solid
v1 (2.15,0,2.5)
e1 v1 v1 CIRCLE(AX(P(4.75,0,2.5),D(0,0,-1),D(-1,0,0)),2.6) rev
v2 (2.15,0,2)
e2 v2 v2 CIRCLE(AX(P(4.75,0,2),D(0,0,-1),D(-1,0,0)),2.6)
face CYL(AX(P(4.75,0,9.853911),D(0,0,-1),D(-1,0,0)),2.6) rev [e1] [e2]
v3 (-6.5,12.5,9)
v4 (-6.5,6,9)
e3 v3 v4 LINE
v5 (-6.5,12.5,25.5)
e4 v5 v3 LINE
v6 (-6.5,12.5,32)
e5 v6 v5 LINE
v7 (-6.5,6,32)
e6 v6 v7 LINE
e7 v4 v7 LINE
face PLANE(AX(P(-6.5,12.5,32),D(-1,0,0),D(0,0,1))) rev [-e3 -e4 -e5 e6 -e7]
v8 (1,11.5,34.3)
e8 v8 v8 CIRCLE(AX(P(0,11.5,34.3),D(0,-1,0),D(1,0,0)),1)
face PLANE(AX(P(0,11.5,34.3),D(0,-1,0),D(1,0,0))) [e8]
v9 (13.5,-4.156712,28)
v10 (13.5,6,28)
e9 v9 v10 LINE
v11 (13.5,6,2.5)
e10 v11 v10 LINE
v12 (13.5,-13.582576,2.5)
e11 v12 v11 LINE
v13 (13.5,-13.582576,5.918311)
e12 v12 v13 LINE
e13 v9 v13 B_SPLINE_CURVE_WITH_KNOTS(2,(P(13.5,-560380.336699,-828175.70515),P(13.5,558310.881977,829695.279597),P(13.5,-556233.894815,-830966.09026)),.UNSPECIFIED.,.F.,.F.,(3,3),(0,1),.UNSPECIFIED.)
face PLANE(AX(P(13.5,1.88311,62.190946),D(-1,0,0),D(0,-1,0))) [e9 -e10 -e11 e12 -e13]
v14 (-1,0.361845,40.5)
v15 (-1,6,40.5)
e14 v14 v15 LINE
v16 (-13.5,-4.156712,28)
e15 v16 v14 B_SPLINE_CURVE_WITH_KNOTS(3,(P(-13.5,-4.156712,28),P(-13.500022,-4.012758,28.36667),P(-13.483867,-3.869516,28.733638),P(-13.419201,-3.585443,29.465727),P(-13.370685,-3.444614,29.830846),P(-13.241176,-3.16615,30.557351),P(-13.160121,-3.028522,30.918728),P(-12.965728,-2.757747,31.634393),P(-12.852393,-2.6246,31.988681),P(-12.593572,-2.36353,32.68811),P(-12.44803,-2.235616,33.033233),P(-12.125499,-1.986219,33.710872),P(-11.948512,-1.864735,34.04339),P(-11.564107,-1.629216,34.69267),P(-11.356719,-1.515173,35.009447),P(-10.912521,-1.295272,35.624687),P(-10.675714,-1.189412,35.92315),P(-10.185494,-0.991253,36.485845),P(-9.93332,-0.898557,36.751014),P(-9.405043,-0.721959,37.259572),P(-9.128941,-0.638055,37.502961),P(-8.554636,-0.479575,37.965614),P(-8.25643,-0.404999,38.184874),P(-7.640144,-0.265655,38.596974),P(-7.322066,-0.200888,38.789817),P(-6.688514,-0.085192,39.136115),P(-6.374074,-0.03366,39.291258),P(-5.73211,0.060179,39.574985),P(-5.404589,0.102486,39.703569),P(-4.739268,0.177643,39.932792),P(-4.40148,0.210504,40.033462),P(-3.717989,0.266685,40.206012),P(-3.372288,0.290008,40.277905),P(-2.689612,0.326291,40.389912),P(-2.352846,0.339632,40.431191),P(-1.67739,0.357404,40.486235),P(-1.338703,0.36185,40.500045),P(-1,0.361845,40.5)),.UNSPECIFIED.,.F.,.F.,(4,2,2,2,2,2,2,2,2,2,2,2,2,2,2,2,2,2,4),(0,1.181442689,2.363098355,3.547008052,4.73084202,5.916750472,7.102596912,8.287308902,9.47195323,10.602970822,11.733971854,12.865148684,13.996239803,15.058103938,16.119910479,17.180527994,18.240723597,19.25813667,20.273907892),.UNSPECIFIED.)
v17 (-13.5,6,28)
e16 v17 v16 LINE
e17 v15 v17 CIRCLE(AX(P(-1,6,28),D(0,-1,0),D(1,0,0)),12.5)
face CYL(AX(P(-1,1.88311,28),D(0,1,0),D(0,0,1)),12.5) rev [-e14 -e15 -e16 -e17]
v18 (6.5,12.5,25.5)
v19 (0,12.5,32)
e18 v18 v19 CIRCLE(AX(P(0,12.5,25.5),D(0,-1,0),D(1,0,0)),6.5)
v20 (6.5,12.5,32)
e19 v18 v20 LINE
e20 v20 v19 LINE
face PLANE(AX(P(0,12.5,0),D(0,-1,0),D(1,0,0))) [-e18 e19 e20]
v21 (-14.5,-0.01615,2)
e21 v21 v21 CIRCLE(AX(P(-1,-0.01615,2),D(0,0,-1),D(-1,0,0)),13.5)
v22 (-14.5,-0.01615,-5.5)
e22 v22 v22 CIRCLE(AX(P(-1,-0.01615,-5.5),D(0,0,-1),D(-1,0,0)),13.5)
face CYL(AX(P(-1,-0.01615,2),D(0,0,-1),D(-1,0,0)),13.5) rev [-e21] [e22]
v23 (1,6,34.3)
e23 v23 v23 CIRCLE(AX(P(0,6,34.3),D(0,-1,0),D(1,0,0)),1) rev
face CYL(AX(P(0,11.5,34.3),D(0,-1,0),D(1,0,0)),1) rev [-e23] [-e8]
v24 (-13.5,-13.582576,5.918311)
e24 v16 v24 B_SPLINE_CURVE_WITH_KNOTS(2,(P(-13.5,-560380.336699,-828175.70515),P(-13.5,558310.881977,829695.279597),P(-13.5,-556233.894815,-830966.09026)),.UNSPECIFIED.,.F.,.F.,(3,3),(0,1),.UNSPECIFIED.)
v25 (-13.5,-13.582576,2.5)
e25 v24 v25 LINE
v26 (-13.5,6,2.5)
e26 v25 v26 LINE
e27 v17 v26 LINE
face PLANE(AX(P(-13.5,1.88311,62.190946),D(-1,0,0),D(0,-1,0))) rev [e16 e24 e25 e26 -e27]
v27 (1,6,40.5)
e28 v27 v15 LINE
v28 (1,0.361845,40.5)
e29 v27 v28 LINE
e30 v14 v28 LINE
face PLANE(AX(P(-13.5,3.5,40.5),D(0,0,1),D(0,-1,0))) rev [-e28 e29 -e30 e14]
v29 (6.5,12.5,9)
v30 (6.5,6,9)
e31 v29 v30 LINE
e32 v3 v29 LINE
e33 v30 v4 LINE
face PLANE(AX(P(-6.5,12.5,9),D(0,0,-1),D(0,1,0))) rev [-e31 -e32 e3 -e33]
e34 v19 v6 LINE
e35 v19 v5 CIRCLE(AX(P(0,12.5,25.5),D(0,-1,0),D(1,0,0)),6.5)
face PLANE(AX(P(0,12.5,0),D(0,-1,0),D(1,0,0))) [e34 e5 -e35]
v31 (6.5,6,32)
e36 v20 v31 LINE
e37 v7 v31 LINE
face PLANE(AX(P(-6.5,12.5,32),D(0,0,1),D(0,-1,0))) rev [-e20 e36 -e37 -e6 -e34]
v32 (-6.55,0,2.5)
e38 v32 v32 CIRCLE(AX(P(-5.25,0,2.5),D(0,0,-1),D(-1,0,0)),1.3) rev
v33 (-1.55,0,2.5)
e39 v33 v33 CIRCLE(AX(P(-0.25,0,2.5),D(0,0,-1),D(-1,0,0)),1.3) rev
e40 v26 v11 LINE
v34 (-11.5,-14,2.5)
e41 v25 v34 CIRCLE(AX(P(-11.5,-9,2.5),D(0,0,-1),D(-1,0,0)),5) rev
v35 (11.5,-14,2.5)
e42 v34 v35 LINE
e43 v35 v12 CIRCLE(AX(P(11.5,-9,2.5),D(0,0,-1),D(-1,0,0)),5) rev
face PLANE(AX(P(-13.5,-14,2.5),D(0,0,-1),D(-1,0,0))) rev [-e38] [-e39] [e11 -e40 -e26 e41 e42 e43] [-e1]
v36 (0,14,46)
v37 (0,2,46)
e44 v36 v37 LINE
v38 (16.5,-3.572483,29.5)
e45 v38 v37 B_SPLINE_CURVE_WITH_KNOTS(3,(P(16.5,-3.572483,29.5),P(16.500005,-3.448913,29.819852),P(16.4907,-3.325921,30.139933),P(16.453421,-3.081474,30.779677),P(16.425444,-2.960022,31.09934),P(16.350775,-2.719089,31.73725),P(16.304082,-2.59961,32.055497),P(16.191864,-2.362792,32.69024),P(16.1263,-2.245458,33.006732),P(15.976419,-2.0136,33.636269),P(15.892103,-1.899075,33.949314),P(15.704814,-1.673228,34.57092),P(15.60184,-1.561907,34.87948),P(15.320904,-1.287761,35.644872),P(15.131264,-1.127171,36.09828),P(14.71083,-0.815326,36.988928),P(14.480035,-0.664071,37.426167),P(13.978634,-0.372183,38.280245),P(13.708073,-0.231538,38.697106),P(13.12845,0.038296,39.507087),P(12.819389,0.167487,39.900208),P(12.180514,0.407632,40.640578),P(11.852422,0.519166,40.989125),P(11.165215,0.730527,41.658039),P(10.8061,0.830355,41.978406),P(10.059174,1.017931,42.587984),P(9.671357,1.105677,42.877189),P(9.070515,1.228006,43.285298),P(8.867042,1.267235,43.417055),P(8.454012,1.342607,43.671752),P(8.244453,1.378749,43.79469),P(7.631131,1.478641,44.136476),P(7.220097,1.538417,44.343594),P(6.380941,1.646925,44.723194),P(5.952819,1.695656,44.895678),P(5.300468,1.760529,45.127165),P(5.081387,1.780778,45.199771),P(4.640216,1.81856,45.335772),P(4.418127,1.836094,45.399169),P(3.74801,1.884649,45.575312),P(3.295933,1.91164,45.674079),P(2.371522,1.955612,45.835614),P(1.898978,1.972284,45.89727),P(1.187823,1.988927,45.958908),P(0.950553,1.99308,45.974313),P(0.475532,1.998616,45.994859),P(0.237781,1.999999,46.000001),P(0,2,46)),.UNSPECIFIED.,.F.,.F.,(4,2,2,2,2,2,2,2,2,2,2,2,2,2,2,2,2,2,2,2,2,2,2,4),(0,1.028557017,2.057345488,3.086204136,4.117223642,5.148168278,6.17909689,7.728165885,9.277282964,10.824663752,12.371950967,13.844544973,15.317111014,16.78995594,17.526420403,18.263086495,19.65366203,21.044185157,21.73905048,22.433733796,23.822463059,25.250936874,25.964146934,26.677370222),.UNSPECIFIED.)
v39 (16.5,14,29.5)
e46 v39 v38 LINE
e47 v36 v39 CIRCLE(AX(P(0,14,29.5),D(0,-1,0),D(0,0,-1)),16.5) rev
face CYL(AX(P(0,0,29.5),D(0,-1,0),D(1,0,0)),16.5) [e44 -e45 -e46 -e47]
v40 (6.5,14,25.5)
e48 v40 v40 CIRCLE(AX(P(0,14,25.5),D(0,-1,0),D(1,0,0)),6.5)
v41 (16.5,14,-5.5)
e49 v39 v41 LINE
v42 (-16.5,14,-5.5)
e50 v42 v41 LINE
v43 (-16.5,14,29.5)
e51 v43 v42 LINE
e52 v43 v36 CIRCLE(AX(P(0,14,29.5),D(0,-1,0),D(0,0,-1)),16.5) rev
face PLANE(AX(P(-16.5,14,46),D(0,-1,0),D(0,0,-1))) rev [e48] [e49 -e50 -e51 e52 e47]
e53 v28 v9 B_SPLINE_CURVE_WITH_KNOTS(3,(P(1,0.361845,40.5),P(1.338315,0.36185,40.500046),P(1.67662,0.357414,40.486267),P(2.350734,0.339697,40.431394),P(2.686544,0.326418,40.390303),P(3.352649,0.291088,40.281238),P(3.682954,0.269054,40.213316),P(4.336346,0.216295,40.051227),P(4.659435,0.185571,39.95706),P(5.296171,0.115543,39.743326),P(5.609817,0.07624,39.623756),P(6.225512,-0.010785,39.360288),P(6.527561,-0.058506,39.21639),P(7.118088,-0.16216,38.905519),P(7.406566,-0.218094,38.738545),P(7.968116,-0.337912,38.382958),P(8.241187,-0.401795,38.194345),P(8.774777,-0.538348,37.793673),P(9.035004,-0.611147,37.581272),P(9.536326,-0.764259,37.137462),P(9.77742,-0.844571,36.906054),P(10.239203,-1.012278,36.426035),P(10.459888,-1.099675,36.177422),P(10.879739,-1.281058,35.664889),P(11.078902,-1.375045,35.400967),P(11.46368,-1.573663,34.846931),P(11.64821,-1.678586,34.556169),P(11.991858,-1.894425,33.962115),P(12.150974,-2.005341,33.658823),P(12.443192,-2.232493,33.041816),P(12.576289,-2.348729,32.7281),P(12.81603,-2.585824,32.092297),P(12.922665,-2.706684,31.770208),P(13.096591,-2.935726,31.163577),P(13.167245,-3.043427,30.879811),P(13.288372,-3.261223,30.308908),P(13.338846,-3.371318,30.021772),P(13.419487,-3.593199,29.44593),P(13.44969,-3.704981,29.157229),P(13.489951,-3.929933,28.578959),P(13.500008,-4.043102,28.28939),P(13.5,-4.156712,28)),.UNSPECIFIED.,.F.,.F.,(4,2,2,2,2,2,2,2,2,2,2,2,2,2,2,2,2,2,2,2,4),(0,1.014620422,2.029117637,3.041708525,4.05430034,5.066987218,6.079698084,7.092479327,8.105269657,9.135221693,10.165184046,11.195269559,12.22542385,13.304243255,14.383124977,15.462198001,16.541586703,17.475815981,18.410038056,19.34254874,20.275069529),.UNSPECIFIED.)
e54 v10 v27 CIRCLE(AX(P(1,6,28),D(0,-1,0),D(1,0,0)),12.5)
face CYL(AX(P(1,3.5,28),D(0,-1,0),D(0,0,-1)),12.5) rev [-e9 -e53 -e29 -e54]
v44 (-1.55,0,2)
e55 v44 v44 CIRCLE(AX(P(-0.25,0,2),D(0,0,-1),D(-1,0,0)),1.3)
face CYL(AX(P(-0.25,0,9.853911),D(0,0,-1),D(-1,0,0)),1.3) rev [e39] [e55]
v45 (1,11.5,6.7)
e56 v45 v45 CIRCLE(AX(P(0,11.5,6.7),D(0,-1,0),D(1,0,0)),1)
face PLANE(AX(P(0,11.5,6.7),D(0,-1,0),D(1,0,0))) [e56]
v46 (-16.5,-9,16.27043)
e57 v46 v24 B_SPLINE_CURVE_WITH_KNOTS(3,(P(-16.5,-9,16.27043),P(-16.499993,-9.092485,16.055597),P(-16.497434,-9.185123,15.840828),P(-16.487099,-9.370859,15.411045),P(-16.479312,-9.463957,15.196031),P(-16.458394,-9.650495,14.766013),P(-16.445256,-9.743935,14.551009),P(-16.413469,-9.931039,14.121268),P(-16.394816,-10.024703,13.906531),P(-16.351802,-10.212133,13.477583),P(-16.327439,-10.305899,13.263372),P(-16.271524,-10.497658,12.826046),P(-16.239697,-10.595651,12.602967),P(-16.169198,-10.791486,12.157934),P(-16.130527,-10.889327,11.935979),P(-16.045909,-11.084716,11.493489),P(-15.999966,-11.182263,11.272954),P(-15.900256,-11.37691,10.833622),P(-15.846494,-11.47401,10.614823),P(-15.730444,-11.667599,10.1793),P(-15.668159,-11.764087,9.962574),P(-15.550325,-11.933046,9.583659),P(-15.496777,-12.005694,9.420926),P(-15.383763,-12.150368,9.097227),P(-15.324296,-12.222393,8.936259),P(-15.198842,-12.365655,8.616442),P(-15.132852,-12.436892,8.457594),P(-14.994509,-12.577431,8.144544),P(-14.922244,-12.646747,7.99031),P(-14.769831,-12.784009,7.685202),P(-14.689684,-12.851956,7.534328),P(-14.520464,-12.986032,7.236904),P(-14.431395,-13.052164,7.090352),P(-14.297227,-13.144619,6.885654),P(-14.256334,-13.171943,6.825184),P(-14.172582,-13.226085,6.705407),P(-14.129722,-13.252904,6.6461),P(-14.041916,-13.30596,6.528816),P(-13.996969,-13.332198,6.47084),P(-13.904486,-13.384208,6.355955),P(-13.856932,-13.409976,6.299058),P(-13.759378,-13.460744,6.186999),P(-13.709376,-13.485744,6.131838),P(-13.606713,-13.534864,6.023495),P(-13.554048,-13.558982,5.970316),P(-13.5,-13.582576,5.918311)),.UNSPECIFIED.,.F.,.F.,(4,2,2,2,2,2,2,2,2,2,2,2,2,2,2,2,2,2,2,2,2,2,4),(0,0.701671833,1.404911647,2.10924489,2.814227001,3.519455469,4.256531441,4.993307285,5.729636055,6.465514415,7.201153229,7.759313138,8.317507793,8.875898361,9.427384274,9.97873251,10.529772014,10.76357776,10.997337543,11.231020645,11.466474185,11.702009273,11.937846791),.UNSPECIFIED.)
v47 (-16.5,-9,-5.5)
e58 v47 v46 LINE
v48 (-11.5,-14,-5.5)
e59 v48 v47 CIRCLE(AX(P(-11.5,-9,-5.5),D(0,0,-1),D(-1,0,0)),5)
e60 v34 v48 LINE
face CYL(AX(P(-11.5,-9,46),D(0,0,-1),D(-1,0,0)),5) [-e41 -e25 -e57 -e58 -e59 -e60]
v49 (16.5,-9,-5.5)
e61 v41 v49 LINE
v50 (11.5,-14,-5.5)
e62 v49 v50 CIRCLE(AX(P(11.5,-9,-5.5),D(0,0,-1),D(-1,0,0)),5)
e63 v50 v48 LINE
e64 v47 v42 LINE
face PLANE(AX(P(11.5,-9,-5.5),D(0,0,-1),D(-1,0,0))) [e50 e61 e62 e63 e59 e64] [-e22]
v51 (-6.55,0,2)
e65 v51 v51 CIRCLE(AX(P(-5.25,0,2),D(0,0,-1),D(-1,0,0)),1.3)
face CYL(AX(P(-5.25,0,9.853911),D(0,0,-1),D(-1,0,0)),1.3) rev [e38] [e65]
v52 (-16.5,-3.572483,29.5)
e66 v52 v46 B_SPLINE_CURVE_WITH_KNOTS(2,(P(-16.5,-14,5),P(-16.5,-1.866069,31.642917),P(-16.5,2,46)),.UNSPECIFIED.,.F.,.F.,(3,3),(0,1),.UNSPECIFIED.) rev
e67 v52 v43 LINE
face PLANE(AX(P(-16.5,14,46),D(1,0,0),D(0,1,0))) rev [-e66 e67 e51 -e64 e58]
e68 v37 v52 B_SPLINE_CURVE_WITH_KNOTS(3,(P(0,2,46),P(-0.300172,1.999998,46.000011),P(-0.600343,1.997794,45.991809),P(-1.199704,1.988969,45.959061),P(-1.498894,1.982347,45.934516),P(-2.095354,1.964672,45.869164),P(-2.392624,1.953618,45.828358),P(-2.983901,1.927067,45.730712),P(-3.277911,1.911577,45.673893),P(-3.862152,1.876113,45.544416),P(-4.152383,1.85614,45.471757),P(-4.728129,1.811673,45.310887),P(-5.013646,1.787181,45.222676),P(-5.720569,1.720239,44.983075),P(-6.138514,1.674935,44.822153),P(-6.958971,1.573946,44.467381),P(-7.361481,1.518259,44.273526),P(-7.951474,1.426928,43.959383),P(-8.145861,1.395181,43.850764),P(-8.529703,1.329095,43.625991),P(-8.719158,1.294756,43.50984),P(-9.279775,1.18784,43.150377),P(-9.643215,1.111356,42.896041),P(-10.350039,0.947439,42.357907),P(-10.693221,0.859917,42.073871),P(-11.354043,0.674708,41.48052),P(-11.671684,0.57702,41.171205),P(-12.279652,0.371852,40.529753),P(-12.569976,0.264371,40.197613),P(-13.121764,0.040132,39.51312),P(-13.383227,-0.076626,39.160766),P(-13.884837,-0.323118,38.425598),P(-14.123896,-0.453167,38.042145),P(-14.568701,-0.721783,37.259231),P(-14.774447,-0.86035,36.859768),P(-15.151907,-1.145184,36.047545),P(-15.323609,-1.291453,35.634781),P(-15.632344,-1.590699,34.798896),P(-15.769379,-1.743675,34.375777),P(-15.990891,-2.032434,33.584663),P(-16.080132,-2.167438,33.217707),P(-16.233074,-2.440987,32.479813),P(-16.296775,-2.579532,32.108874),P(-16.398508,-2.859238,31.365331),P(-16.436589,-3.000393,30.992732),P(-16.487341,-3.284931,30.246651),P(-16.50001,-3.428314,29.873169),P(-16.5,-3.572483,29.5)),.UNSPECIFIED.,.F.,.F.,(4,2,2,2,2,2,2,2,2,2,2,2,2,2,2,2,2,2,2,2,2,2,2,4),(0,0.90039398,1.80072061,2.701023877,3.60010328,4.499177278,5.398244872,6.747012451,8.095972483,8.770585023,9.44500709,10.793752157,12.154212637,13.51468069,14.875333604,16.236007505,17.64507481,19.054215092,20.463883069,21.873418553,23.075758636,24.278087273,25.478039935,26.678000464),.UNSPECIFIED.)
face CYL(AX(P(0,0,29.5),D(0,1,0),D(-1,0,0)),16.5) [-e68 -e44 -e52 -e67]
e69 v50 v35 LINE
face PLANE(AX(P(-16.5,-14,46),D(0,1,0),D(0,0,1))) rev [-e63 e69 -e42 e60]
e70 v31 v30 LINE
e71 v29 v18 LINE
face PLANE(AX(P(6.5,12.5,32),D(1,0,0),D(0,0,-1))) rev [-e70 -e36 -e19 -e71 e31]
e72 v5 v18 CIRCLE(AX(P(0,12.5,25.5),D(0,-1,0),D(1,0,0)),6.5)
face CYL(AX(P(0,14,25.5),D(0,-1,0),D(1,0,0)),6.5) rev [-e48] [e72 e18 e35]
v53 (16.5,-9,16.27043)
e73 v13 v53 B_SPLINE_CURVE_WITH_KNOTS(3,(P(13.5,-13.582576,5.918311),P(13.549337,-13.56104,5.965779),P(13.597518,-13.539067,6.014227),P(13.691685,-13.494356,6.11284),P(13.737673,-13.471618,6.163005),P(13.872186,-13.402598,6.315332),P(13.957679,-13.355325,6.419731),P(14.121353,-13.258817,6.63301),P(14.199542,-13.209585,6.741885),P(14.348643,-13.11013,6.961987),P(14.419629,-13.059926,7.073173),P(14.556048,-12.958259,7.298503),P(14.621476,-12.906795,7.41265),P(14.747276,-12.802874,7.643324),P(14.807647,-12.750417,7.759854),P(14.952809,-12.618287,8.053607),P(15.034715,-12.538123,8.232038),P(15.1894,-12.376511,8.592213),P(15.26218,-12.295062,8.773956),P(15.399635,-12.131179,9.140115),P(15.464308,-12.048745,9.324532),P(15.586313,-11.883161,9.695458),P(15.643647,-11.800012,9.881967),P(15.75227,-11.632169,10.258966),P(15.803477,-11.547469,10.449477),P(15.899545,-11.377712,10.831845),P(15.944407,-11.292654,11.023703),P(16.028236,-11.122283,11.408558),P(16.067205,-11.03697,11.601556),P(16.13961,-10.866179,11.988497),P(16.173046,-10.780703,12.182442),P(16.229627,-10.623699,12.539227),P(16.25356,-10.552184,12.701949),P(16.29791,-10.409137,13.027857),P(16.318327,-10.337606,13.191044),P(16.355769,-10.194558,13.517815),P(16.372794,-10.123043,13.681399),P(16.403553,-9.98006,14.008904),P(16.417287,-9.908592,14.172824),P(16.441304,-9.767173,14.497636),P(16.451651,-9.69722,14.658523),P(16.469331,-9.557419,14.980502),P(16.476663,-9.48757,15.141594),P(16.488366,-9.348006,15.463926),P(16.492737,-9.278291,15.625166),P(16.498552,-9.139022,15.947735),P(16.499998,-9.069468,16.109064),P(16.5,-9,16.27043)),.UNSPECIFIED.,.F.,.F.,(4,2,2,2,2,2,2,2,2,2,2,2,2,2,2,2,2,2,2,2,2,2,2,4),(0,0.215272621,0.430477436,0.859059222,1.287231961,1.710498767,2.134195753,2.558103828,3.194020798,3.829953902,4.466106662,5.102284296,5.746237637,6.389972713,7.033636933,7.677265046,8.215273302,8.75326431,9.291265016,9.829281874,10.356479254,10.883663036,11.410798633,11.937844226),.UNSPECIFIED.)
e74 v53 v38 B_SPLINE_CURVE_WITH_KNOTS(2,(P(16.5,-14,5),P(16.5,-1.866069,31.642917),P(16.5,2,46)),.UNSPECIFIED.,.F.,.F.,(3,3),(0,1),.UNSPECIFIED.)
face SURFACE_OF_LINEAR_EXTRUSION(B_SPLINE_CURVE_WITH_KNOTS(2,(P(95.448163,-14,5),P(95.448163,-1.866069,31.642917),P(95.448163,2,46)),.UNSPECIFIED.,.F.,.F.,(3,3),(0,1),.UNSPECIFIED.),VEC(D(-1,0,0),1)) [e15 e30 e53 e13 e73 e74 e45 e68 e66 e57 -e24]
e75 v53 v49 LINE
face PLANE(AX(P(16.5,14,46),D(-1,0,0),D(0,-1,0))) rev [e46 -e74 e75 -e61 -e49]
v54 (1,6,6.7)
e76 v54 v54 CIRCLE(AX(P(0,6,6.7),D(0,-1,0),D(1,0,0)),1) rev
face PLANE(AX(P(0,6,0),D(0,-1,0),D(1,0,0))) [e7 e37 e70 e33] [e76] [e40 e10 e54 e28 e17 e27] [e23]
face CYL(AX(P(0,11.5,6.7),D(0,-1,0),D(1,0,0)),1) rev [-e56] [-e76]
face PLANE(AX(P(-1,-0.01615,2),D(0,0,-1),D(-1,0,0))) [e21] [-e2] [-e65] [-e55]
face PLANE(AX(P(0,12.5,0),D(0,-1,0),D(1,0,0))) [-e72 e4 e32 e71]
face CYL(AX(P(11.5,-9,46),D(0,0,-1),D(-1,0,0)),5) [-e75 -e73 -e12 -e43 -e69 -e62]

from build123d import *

# Parameters (mm, degrees)
SKETCH1_W               = 33
SKETCH1_H               = 28
BOSS_EXTRUDE1_DEPTH     = 46
CUT_EXTRUDE1_DEPTH      = 59.318093247
CUT_EXTRUDE1_DEPTH_BACK = 59.318093247
CUT_EXTRUDE2_START      = -3
CUT_EXTRUDE2_DEPTH      = 27
FILLET1_R               = 12.5
FILLET2_R               = 16.5
FILLET3_R               = 5
SKETCH4_W               = 13
SKETCH4_H               = 23
CUT_EXTRUDE3_DEPTH      = 9
SKETCH5_R               = 6.5
CUT_EXTRUDE4_DEPTH      = 56.592265809
SKETCH6_R               = 1
CUT_EXTRUDE5_DEPTH      = 8
BOSS_EXTRUDE2_DEPTH     = 5.5
SKETCH11_R              = 13.5
CUT_EXTRUDE8_DEPTH      = 7.5
SKETCH7_R               = 1.3
SKETCH7_R_2             = 2.6
CUT_EXTRUDE6_DEPTH      = 0.5
SKETCH12_R              = 1
CUT_EXTRUDE9_DEPTH      = 2.5


with BuildPart() as part:
    # Sketch1 → Boss-Extrude1 (new body)
    with BuildSketch(Plane.XY):
        Rectangle(SKETCH1_W, SKETCH1_H)
    extrude(amount=BOSS_EXTRUDE1_DEPTH)

    # Sketch2 → Cut-Extrude1 (cut, two sides: drawn at the far end of the back side and taken through both)
    with BuildSketch(Plane(origin=(16.5, 0, 0), x_dir=(0, 0, -1), z_dir=(1, 0, 0)).offset(-CUT_EXTRUDE1_DEPTH_BACK)):
        with BuildLine():
            Line((-46, -14), (-5, -14))
            add(Edge.make_bspline(
                [(-5, -14), (-31.642917286, -1.866068932), (-46, 2)],
                knots=[0, 0, 0, 1, 1, 1], degree=2))
            Line((-46, 2), (-46, -14))
        make_face()
    extrude(amount=CUT_EXTRUDE1_DEPTH + CUT_EXTRUDE1_DEPTH_BACK, mode=Mode.SUBTRACT)

    # Sketch3 → Cut-Extrude2 (cut)
    with BuildSketch(Plane(origin=(16.5, 0, 0), x_dir=(0, 0, -1), z_dir=(1, 0, 0)).offset(CUT_EXTRUDE2_START)):
        with BuildLine():
            Line((-5, -14), (-2.5, -14))
            Line((-2.5, -14), (-2.5, 3.5))
            Line((-2.5, 3.5), (-40.5, 3.5))
            Line((-40.5, 3.5), (-40.5, 0.361845))
            add(Edge.make_bspline(
                [(-5, -14), (-26.900788686, -4.025767171), (-40.5, 0.361845)],
                knots=[0, 0, 0, 1, 1, 1], degree=2))
        make_face()
    extrude(amount=-CUT_EXTRUDE2_DEPTH, mode=Mode.SUBTRACT)

    # Fillet1
    fillet1_edges = [part.edges().sort_by_distance(p)[0] for p in [
        (13.5, 1.9309225, 40.5),
        (-13.5, 1.9309225, 40.5),
    ]]
    fillet(fillet1_edges, radius=FILLET1_R)

    # Fillet2
    fillet2_edges = [part.edges().sort_by_distance(p)[0] for p in [
        (16.5, 8, 46),
        (-16.5, 8, 46),
    ]]
    fillet(fillet2_edges, radius=FILLET2_R - 0.0001)  # a hair under: the kernel refuses the full size

    # Fillet3
    fillet3_edges = [part.edges().sort_by_distance(p)[0] for p in [
        (16.5, -14, 2.5),
        (-16.5, -14, 2.5),
    ]]
    fillet(fillet3_edges, radius=FILLET3_R)

    # Sketch4 → Cut-Extrude3 (cut)
    with BuildSketch(Plane.XZ.offset(-3.5)):
        with Locations((0, 20.5)):
            Rectangle(SKETCH4_W, SKETCH4_H)
    extrude(amount=-CUT_EXTRUDE3_DEPTH, mode=Mode.SUBTRACT)

    # Sketch5 → Cut-Extrude4 (cut, through all)
    with BuildSketch(Plane.XZ.offset(-12.5)):
        with Locations((0, 25.5)):
            Circle(SKETCH5_R)
    extrude(amount=-CUT_EXTRUDE4_DEPTH, mode=Mode.SUBTRACT)

    # Sketch6 → Cut-Extrude5 (cut)
    with BuildSketch(Plane.XZ.offset(-3.5)):
        with Locations((0, 34.3)):
            Circle(SKETCH6_R)
        with Locations((0, 6.7)):
            Circle(SKETCH6_R)
    extrude(amount=-CUT_EXTRUDE5_DEPTH, mode=Mode.SUBTRACT)

    # Sketch10 → Boss-Extrude2 (add)
    with BuildSketch(Plane(origin=(0, 0, 0), x_dir=(-1, 0, 0), z_dir=(0, 0, -1))):
        with BuildLine():
            Line((-16.5, 14), (-16.5, -9))
            ThreePointArc((-16.5, -9), (-15.035533906, -12.535533906), (-11.5, -14))
            Line((-11.5, -14), (11.5, -14))
            ThreePointArc((11.5, -14), (15.035533906, -12.535533906), (16.5, -9))
            Line((16.5, -9), (16.5, 14))
            Line((16.5, 14), (-16.5, 14))
        make_face()
    extrude(amount=BOSS_EXTRUDE2_DEPTH)

    # Sketch11 → Cut-Extrude8 (cut)
    with BuildSketch(Plane(origin=(0, 0, -5.5), x_dir=(-1, 0, 0), z_dir=(0, 0, -1))):
        with Locations((1, -0.016150077)):
            Circle(SKETCH11_R)
    extrude(amount=-CUT_EXTRUDE8_DEPTH, mode=Mode.SUBTRACT)

    # Sketch7 → Cut-Extrude6 (cut)
    with BuildSketch(Plane(origin=(0, 0, 2), x_dir=(-1, 0, 0), z_dir=(0, 0, -1))):
        with Locations((5.25, 0)):
            Circle(SKETCH7_R)
        with Locations((-4.75, 0)):
            Circle(SKETCH7_R_2)
        with Locations((0.25, 0)):
            Circle(SKETCH7_R)
    extrude(amount=-CUT_EXTRUDE6_DEPTH, mode=Mode.SUBTRACT)

    # Sketch12 → Cut-Extrude9 (cut)
    with BuildSketch(Plane.XZ.offset(-3.5)):
        with BuildLine():
            Line((-13.5, 2.5), (13.5, 2.5))
            Line((13.5, 2.5), (13.5, 28))
            ThreePointArc((13.5, 28), (9.838834765, 36.838834765), (1, 40.5))
            Line((1, 40.5), (-1, 40.5))
            ThreePointArc((-1, 40.5), (-9.838834765, 36.838834765), (-13.5, 28))
            Line((-13.5, 28), (-13.5, 2.5))
        make_face()
        with Locations((0, 6.7)):
            Circle(SKETCH12_R, mode=Mode.SUBTRACT)
        Polygon((6.5, 9), (-6.5, 9), (-6.5, 32), (0, 32), (6.5, 32), align=None, mode=Mode.SUBTRACT)
        with Locations((0, 34.3)):
            Circle(SKETCH12_R, mode=Mode.SUBTRACT)
    extrude(amount=-CUT_EXTRUDE9_DEPTH, mode=Mode.SUBTRACT)


solid = part.part
